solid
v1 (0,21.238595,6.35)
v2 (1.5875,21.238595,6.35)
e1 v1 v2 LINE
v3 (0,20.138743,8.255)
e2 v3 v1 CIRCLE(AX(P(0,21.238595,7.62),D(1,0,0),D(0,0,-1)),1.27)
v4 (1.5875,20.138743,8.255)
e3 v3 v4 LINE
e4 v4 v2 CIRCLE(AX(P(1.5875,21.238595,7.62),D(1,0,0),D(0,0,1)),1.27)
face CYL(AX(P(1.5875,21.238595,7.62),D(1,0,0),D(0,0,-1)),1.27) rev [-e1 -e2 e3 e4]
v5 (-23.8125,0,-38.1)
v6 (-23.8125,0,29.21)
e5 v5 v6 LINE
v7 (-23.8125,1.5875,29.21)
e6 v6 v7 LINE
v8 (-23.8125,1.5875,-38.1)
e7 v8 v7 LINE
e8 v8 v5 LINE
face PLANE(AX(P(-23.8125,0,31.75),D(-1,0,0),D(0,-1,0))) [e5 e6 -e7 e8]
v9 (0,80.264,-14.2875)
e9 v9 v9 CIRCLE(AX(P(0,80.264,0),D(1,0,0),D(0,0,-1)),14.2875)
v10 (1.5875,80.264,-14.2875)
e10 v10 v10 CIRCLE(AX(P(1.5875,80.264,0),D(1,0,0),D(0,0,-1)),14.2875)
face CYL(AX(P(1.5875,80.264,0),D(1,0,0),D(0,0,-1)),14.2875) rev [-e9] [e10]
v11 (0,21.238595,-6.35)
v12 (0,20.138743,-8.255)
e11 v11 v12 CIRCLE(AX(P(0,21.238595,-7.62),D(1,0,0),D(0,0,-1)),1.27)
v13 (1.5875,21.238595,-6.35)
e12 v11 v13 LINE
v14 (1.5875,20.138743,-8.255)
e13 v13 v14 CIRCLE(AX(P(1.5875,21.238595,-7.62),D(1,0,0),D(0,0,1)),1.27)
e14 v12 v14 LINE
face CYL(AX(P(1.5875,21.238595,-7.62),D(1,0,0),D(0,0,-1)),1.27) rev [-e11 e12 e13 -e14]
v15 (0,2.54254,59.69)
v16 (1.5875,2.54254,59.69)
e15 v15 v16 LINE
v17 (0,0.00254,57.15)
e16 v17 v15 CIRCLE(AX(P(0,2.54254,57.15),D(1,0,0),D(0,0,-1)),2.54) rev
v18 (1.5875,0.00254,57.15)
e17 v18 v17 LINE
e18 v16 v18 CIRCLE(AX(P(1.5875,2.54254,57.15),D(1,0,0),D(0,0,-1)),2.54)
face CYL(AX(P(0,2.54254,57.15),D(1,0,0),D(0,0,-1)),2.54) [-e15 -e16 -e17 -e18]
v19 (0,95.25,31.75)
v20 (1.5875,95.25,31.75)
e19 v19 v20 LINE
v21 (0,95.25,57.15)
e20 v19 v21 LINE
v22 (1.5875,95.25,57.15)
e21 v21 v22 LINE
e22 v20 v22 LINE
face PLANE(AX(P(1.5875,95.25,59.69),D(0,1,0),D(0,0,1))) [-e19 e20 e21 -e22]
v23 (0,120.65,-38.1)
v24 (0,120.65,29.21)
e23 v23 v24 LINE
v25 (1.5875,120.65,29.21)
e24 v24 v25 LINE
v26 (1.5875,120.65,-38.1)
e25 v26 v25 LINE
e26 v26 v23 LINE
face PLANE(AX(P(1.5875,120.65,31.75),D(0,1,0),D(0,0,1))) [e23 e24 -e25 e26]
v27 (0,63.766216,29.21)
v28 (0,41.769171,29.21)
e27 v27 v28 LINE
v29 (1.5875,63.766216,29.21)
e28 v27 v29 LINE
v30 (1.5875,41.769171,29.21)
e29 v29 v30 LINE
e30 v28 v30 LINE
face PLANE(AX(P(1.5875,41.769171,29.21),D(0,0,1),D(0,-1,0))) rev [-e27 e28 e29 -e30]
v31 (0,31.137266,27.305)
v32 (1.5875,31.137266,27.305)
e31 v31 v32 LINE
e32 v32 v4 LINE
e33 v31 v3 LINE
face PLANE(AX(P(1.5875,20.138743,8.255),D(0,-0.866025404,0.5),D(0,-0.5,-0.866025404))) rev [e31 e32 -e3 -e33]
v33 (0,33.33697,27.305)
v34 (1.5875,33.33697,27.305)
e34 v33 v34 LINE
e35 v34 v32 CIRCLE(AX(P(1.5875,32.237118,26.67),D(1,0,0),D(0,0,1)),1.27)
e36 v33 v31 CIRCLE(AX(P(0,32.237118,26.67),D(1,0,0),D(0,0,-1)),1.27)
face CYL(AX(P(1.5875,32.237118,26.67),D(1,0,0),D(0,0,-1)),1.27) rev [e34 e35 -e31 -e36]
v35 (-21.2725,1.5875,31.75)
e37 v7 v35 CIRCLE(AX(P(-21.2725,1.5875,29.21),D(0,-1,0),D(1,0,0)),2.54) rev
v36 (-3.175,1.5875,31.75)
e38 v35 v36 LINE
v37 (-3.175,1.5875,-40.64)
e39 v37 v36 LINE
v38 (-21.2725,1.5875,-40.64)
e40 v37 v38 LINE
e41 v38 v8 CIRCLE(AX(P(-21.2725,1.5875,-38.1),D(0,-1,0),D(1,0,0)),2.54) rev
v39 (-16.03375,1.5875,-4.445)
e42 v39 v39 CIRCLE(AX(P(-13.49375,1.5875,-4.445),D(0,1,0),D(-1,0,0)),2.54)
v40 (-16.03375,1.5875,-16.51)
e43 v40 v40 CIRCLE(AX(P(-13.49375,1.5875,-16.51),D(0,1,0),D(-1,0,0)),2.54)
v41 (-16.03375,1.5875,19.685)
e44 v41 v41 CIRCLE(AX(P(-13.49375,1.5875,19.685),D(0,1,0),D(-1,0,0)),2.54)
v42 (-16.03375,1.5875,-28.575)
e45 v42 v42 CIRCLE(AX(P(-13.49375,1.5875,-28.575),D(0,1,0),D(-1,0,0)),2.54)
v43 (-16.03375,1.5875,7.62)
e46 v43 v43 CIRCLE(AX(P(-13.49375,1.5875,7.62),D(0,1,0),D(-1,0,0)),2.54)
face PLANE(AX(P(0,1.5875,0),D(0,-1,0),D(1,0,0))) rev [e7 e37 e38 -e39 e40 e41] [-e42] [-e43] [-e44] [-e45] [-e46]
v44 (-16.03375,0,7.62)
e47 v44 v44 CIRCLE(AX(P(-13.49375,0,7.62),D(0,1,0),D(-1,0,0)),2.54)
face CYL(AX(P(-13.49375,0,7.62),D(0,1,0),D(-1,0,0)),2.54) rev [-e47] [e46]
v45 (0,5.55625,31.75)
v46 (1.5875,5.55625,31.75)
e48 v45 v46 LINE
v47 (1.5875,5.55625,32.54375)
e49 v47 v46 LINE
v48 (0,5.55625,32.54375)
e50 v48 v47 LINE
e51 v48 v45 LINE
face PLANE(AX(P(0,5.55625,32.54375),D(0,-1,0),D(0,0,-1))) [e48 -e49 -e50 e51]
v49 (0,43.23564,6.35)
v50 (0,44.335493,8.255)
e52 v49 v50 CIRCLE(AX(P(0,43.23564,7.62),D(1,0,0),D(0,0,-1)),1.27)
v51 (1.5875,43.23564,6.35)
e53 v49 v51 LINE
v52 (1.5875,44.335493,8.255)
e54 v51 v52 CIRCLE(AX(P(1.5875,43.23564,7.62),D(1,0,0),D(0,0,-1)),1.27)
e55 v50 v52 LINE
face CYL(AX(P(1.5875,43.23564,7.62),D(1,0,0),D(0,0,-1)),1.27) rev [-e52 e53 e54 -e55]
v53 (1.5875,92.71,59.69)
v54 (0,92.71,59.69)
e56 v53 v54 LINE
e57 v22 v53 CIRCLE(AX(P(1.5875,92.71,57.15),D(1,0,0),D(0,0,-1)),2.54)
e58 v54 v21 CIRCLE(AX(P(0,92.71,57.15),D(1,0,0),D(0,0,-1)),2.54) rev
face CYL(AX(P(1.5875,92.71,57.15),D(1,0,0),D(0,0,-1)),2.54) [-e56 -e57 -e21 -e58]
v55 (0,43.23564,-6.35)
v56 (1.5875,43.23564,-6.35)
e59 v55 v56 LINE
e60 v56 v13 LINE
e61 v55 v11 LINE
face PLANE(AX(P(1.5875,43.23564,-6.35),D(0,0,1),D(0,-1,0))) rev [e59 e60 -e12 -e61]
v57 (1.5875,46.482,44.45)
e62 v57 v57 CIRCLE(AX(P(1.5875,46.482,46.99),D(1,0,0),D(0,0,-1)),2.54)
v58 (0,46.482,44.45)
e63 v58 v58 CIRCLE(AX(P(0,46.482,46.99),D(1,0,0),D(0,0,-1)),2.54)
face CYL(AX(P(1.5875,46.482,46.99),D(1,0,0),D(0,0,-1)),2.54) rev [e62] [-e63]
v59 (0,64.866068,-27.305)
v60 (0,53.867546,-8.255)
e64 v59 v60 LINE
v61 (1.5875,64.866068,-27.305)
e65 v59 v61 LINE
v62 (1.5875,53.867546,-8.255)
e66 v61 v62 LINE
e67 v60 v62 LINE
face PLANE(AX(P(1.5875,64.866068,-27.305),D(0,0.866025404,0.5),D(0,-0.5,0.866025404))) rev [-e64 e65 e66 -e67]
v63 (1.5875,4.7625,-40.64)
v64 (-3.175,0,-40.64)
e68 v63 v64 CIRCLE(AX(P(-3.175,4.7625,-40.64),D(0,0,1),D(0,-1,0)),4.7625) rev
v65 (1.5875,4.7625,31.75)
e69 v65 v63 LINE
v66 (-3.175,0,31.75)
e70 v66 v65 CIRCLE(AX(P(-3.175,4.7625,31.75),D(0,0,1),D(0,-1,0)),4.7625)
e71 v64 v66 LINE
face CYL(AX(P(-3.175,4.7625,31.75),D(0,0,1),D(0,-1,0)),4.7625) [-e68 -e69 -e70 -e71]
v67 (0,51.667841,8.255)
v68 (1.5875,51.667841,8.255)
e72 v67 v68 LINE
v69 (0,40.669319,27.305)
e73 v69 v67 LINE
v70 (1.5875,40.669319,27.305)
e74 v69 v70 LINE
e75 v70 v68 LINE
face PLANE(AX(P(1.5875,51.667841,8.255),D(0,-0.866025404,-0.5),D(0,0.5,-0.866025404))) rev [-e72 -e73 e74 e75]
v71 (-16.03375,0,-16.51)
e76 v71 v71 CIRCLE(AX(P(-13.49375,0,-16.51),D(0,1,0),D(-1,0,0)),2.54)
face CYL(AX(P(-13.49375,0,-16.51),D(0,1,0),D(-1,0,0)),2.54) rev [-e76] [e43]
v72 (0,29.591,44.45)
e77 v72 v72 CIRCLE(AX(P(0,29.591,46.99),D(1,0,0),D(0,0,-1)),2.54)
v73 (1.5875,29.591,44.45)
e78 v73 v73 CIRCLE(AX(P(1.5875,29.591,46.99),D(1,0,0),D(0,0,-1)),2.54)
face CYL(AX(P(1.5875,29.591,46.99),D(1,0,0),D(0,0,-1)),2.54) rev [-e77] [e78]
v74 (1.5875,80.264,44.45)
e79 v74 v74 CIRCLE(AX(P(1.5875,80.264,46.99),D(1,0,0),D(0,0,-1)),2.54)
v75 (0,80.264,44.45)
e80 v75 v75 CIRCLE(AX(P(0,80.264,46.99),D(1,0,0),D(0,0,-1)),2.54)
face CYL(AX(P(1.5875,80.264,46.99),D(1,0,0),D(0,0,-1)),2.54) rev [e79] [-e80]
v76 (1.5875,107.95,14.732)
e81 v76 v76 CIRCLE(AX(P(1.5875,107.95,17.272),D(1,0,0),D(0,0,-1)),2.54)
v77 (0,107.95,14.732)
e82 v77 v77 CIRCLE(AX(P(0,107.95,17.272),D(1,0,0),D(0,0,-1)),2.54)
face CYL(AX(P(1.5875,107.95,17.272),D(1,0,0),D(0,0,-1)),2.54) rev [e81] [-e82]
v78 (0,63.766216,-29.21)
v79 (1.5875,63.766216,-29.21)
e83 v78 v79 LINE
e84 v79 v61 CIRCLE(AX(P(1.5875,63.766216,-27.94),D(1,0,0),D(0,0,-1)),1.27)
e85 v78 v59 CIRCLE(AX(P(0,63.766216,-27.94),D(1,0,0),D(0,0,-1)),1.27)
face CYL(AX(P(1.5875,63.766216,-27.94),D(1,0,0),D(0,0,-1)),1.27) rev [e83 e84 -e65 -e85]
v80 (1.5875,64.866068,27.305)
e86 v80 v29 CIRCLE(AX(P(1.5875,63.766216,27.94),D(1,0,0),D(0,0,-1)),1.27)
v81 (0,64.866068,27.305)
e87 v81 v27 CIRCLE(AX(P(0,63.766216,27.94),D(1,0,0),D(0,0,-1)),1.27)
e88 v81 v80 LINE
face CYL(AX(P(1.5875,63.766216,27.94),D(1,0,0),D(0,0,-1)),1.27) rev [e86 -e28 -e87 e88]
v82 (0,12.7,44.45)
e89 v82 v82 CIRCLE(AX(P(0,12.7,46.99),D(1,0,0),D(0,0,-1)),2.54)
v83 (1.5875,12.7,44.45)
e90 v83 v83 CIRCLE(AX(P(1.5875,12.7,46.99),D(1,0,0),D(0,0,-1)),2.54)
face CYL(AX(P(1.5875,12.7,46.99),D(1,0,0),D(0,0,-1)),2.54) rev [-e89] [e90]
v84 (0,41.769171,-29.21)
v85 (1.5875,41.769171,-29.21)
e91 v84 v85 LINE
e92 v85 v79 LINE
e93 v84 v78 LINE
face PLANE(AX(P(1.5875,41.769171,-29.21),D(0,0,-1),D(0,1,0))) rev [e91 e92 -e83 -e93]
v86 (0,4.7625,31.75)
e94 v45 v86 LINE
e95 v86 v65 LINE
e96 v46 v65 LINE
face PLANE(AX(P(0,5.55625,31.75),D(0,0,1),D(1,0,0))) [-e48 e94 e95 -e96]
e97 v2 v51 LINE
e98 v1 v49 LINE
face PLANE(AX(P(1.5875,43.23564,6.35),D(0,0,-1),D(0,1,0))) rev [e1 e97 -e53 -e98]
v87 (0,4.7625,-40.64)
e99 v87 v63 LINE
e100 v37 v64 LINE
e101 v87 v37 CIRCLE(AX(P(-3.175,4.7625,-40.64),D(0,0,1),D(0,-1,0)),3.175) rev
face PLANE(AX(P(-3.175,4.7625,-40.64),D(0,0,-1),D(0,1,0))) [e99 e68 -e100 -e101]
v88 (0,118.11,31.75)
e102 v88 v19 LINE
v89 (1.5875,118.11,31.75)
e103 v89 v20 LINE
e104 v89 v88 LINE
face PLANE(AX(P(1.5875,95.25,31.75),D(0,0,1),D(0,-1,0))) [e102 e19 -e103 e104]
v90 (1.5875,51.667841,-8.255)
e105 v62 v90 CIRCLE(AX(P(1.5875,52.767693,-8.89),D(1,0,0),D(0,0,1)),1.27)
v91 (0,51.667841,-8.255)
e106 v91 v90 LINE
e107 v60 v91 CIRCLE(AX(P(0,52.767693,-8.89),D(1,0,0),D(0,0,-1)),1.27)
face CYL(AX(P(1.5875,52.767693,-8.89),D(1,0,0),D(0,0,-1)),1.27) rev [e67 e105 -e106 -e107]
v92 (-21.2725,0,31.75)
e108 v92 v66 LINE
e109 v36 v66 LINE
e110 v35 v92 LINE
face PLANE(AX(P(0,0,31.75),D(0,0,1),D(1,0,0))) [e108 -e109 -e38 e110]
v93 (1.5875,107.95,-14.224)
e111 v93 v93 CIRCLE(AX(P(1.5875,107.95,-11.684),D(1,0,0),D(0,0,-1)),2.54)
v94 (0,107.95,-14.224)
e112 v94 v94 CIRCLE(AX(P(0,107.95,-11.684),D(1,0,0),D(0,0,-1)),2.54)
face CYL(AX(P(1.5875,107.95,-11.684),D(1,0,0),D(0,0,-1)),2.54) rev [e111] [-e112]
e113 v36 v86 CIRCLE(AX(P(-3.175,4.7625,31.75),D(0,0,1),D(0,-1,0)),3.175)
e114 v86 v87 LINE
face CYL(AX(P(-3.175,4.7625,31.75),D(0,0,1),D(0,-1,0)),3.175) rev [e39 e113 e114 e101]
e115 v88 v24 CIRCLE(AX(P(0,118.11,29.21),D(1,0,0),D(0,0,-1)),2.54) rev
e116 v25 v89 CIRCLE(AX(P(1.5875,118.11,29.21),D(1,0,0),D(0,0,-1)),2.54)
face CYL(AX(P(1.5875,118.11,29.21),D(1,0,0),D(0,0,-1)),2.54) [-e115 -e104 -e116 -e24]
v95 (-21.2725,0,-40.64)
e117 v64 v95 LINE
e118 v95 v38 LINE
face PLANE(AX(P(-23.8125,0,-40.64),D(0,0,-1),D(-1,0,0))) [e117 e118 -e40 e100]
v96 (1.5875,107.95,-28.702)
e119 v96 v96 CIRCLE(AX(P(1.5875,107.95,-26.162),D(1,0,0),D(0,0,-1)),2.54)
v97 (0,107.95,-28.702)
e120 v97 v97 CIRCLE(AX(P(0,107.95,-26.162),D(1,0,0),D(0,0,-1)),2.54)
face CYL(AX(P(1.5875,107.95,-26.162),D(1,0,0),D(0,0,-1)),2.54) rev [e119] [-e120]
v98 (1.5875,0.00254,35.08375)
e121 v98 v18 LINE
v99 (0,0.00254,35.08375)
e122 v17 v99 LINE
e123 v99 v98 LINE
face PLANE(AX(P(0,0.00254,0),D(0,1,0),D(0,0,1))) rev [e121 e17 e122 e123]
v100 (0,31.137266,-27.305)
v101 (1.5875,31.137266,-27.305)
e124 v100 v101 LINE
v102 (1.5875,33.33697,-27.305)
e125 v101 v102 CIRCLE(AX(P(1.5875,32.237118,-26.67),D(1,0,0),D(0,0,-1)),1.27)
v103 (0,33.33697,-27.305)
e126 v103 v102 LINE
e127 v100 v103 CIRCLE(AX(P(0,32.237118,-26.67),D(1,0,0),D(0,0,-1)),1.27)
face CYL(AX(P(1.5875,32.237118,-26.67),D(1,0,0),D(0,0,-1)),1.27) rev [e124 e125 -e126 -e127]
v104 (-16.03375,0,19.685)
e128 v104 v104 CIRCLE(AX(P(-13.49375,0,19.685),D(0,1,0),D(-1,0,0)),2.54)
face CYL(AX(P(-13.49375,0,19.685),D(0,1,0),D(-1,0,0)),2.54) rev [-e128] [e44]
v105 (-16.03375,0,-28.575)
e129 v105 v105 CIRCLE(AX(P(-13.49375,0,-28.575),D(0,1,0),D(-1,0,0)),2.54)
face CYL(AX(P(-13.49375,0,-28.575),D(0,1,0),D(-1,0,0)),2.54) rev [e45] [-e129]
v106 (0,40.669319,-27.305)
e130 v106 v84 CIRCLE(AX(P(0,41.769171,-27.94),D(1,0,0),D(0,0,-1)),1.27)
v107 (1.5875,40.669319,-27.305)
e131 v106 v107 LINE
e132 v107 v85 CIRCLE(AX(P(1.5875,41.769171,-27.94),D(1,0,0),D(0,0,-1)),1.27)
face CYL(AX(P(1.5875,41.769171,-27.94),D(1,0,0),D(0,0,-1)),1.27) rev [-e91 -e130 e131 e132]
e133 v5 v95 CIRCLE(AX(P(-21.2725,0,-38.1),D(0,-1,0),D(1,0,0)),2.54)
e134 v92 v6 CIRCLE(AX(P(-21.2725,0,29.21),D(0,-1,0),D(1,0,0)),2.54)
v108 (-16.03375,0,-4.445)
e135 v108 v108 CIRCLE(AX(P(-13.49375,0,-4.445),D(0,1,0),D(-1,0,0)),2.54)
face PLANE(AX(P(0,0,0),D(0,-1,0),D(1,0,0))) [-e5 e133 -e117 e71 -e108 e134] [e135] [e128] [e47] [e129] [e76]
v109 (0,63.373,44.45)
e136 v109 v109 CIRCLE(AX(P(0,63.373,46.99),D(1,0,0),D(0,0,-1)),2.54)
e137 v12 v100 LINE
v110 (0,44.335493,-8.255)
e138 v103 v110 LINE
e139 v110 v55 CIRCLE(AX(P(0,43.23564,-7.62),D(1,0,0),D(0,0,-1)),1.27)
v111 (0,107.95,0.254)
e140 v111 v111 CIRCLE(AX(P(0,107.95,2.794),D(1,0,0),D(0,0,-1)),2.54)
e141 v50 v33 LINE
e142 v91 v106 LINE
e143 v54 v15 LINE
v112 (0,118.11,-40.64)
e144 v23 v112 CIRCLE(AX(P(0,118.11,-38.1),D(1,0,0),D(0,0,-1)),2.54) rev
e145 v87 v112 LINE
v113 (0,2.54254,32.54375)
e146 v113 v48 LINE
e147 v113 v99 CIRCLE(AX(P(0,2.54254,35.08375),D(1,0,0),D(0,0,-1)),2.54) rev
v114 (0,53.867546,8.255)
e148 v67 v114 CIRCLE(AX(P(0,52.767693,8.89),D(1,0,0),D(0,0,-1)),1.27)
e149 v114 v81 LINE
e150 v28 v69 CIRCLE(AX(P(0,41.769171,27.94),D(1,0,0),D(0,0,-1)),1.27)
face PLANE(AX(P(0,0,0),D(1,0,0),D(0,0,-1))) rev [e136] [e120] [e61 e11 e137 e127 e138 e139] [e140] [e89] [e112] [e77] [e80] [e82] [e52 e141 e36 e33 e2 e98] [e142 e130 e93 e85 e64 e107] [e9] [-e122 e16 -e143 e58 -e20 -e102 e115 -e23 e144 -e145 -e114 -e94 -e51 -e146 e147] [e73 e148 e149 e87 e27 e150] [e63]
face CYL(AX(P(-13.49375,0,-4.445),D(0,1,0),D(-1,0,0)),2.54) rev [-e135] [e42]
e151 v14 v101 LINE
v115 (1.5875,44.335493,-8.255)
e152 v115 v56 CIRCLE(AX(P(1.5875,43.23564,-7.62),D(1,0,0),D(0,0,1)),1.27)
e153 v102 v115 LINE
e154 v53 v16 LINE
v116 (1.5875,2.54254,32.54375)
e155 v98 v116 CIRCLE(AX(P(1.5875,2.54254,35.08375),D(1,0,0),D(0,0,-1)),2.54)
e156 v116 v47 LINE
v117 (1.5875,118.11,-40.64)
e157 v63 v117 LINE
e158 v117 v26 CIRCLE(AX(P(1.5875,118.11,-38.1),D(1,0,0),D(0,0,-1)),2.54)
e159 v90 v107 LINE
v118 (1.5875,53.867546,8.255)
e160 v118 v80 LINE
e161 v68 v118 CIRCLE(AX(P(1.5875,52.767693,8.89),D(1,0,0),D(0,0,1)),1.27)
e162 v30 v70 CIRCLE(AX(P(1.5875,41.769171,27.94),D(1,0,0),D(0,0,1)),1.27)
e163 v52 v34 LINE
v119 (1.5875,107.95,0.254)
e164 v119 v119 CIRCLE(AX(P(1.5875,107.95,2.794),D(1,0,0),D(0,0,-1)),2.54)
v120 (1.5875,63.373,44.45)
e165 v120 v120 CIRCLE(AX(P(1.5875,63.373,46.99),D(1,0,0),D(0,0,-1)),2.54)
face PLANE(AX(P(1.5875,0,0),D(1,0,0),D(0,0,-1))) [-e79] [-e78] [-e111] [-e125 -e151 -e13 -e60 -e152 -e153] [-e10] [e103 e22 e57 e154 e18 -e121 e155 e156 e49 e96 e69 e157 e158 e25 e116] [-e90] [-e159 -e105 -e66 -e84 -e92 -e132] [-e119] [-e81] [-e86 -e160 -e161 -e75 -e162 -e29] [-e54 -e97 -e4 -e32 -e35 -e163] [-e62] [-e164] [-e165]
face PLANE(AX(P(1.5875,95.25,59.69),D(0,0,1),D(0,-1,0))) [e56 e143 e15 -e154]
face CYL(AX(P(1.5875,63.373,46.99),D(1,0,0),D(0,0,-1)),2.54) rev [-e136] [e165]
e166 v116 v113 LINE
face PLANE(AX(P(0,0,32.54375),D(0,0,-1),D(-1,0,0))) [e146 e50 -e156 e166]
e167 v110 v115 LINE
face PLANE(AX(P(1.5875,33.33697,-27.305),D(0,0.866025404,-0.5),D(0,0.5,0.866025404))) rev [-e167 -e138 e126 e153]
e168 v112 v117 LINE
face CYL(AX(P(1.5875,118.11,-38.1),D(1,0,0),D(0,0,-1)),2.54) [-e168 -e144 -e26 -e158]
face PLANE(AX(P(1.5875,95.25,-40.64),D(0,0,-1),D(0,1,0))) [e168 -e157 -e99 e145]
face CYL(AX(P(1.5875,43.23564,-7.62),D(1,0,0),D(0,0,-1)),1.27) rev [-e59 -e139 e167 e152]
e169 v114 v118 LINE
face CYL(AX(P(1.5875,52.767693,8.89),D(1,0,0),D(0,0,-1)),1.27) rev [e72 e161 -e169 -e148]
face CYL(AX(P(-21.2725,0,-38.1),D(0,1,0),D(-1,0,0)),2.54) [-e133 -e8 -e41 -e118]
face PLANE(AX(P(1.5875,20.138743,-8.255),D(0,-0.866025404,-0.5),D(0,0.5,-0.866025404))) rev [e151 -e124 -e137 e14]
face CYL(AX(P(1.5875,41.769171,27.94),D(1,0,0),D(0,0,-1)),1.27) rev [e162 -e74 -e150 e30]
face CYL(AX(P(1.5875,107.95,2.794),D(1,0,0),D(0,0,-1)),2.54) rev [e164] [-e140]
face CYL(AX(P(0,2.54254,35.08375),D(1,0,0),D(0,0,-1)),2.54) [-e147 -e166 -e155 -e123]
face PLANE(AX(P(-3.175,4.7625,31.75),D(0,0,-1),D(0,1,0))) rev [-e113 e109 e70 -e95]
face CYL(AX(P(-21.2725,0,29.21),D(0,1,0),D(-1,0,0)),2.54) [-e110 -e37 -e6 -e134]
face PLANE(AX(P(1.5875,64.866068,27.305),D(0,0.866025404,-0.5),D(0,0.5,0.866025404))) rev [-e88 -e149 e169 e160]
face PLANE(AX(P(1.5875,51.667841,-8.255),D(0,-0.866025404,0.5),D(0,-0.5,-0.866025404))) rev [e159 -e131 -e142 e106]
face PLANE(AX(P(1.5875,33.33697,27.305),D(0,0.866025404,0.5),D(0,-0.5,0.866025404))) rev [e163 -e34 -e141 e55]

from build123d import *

# Parameters (mm, degrees)
SKETCH2_R                     = 14.2875
SKETCH2_R_2                   = 2.54
BOSS_EXTRUDE1_DEPTH           = 1.5875
SKETCH7_W                     = 1.5875
SKETCH7_H                     = 27.94
CUT_EXTRUDE1_DEPTH            = 0.00254
EDGE_FLANGE2_STRIP_W          = 12.7
EDGE_FLANGE2_STRIP_H          = 1.5875
EDGE_FLANGE2_STRIP_CUT_DEPTH  = 72.39
EDGE_FLANGE2_RELIEF_W         = 13.49375
EDGE_FLANGE2_RELIEF_H         = 0.79375
EDGE_FLANGE2_RELIEF_CUT_DEPTH = 1.5875
EDGE_FLANGE2_DEPTH            = 72.39
SKETCH14_R                    = 2.54
CUT_EXTRUDE2_DEPTH            = 1.5875
FILLET1_R                     = 2.54


# Sheet-metal steps are written as plain solids
with BuildPart() as part:
    # Sketch2 → Boss-Extrude1 (new body)
    with BuildSketch(Plane(origin=(0, 0, 0), x_dir=(0, 0, -1), z_dir=(1, 0, 0))):
        Polygon((-59.69, 95.25), (-59.69, 0), (40.64, 0), (40.64, 95.25), (40.64, 120.65), (-31.75, 120.65), (-31.75, 95.25), align=None)
        with Locations((0, 80.264)):
            Circle(SKETCH2_R, mode=Mode.SUBTRACT)
        with Locations((-46.99, 80.264)):
            Circle(SKETCH2_R_2, mode=Mode.SUBTRACT)
        with Locations((-46.99, 63.373)):
            Circle(SKETCH2_R_2, mode=Mode.SUBTRACT)
        with Locations((-17.272, 107.95)):
            Circle(SKETCH2_R_2, mode=Mode.SUBTRACT)
        with Locations((-2.794, 107.95)):
            Circle(SKETCH2_R_2, mode=Mode.SUBTRACT)
        with Locations((11.684, 107.95)):
            Circle(SKETCH2_R_2, mode=Mode.SUBTRACT)
        with Locations((26.162, 107.95)):
            Circle(SKETCH2_R_2, mode=Mode.SUBTRACT)
        with Locations((-46.99, 46.482)):
            Circle(SKETCH2_R_2, mode=Mode.SUBTRACT)
        with Locations((-46.99, 29.591)):
            Circle(SKETCH2_R_2, mode=Mode.SUBTRACT)
        with Locations((-46.99, 12.7)):
            Circle(SKETCH2_R_2, mode=Mode.SUBTRACT)
        with BuildLine():
            Line((-27.305, 64.866068321), (-8.255, 53.867545693))
            ThreePointArc((-8.255, 53.867545693), (-7.62, 52.76769343), (-8.255, 51.667841167))
            Line((-8.255, 51.667841167), (-27.305, 40.669318539))
            ThreePointArc((-27.305, 40.669318539), (-28.575, 40.669318539), (-29.21, 41.769170802))
            Line((-29.21, 41.769170802), (-29.21, 63.766216058))
            ThreePointArc((-29.21, 63.766216058), (-28.575, 64.866068321), (-27.305, 64.866068321))
        make_face(mode=Mode.SUBTRACT)
        with BuildLine():
            Line((-6.35, 43.235640486), (-6.35, 21.238595229))
            ThreePointArc((-6.35, 21.238595229), (-6.985, 20.138742967), (-8.255, 20.138742967))
            Line((-8.255, 20.138742967), (-27.305, 31.137265595))
            ThreePointArc((-27.305, 31.137265595), (-27.94, 32.237117857), (-27.305, 33.33697012))
            Line((-27.305, 33.33697012), (-8.255, 44.335492748))
            ThreePointArc((-8.255, 44.335492748), (-6.985, 44.335492748), (-6.35, 43.235640486))
        make_face(mode=Mode.SUBTRACT)
        with BuildLine():
            Line((8.255, 20.138742967), (27.305, 31.137265595))
            ThreePointArc((27.305, 31.137265595), (27.94, 32.237117857), (27.305, 33.33697012))
            Line((27.305, 33.33697012), (8.255, 44.335492748))
            ThreePointArc((8.255, 44.335492748), (6.985, 44.335492748), (6.35, 43.235640486))
            Line((6.35, 43.235640486), (6.35, 21.238595229))
            ThreePointArc((6.35, 21.238595229), (6.985, 20.138742967), (8.255, 20.138742967))
        make_face(mode=Mode.SUBTRACT)
        with BuildLine():
            Line((8.255, 51.667841167), (27.305, 40.669318539))
            ThreePointArc((27.305, 40.669318539), (28.575, 40.669318539), (29.21, 41.769170802))
            Line((29.21, 41.769170802), (29.21, 63.766216058))
            ThreePointArc((29.21, 63.766216058), (28.575, 64.866068321), (27.305, 64.866068321))
            Line((27.305, 64.866068321), (8.255, 53.867545693))
            ThreePointArc((8.255, 53.867545693), (7.62, 52.76769343), (8.255, 51.667841167))
        make_face(mode=Mode.SUBTRACT)
    extrude(amount=BOSS_EXTRUDE1_DEPTH)

    # Sketch7 → Cut-Extrude1 (cut)
    with BuildSketch(Plane(origin=(0, 0, 0), x_dir=(-1, 0, 0), z_dir=(0, -1, 0))):
        with Locations((-0.79375, -45.72)):
            Rectangle(SKETCH7_W, SKETCH7_H)
    extrude(amount=-CUT_EXTRUDE1_DEPTH, mode=Mode.SUBTRACT)

    # Edge-Flange2 strip (across the edge) → Edge-Flange2 strip cut (cut)
    with BuildSketch(Plane(origin=(0, 0, -40.64), x_dir=(0, 1, 0), z_dir=(0, 0, 1))):
        with Locations((-1.5875, -0.79375)):
            Rectangle(EDGE_FLANGE2_STRIP_W, EDGE_FLANGE2_STRIP_H)
    extrude(amount=EDGE_FLANGE2_STRIP_CUT_DEPTH, mode=Mode.SUBTRACT)

    # Edge-Flange2 relief (on the sheet) → Edge-Flange2 relief cut (cut)
    with BuildSketch(Plane(origin=(0, 4.7625, -40.64), x_dir=(0, 1, 0), z_dir=(-1, 0, 0))):
        with Locations((-5.953125, -72.786875)):
            Rectangle(EDGE_FLANGE2_RELIEF_W, EDGE_FLANGE2_RELIEF_H)
    extrude(amount=-EDGE_FLANGE2_RELIEF_CUT_DEPTH, mode=Mode.SUBTRACT)

    # Edge-Flange2 section (across the edge) → Edge-Flange2 (add)
    with BuildSketch(Plane(origin=(0, 0, -40.64), x_dir=(0, 1, 0), z_dir=(0, 0, 1))):
        with BuildLine():
            Line((0, 3.175), (0, 23.8125))
            Line((0, 23.8125), (1.5875, 23.8125))
            Line((1.5875, 23.8125), (1.5875, 3.175))
            ThreePointArc((1.5875, 3.175), (2.51743597, 0.92993597), (4.7625, 0))
            Line((4.7625, 0), (4.7625, -1.5875))
            ThreePointArc((4.7625, -1.5875), (1.394903955, -0.192596045), (0, 3.175))
        make_face()
    extrude(amount=EDGE_FLANGE2_DEPTH)

    # Sketch14 → Cut-Extrude2 (cut)
    with BuildSketch(Plane(origin=(0, 1.5875, 0), x_dir=(1, 0, 0), z_dir=(0, 1, 0))):
        with Locations(Location((-13.49375, 28.575, 0), (0, 0, 180))):
            Circle(SKETCH14_R)
        with Locations(Location((-13.49375, 16.51, 0), (0, 0, 180))):
            Circle(SKETCH14_R)
        with Locations(Location((-13.49375, 4.445, 0), (0, 0, 180))):
            Circle(SKETCH14_R)
        with Locations(Location((-13.49375, -7.62, 0), (0, 0, 180))):
            Circle(SKETCH14_R)
        with Locations(Location((-13.49375, -19.685, 0), (0, 0, 180))):
            Circle(SKETCH14_R)
    extrude(amount=-CUT_EXTRUDE2_DEPTH, mode=Mode.SUBTRACT)

    # Fillet1
    fillet1_edges = [part.edges().sort_by_distance(p)[0] for p in [
        (0.79375, 0.00254, 32.54375),
        (-23.8125, 0.79375, -40.64),
        (-23.8125, 0.79375, 31.75),
        (0.79375, 120.65, -40.64),
        (0.79375, 95.25, 59.69),
        (0.79375, 120.65, 31.75),
        (0.79375, 0.00254, 59.69),
    ]]
    fillet(fillet1_edges, radius=FILLET1_R)


solid = part.part
